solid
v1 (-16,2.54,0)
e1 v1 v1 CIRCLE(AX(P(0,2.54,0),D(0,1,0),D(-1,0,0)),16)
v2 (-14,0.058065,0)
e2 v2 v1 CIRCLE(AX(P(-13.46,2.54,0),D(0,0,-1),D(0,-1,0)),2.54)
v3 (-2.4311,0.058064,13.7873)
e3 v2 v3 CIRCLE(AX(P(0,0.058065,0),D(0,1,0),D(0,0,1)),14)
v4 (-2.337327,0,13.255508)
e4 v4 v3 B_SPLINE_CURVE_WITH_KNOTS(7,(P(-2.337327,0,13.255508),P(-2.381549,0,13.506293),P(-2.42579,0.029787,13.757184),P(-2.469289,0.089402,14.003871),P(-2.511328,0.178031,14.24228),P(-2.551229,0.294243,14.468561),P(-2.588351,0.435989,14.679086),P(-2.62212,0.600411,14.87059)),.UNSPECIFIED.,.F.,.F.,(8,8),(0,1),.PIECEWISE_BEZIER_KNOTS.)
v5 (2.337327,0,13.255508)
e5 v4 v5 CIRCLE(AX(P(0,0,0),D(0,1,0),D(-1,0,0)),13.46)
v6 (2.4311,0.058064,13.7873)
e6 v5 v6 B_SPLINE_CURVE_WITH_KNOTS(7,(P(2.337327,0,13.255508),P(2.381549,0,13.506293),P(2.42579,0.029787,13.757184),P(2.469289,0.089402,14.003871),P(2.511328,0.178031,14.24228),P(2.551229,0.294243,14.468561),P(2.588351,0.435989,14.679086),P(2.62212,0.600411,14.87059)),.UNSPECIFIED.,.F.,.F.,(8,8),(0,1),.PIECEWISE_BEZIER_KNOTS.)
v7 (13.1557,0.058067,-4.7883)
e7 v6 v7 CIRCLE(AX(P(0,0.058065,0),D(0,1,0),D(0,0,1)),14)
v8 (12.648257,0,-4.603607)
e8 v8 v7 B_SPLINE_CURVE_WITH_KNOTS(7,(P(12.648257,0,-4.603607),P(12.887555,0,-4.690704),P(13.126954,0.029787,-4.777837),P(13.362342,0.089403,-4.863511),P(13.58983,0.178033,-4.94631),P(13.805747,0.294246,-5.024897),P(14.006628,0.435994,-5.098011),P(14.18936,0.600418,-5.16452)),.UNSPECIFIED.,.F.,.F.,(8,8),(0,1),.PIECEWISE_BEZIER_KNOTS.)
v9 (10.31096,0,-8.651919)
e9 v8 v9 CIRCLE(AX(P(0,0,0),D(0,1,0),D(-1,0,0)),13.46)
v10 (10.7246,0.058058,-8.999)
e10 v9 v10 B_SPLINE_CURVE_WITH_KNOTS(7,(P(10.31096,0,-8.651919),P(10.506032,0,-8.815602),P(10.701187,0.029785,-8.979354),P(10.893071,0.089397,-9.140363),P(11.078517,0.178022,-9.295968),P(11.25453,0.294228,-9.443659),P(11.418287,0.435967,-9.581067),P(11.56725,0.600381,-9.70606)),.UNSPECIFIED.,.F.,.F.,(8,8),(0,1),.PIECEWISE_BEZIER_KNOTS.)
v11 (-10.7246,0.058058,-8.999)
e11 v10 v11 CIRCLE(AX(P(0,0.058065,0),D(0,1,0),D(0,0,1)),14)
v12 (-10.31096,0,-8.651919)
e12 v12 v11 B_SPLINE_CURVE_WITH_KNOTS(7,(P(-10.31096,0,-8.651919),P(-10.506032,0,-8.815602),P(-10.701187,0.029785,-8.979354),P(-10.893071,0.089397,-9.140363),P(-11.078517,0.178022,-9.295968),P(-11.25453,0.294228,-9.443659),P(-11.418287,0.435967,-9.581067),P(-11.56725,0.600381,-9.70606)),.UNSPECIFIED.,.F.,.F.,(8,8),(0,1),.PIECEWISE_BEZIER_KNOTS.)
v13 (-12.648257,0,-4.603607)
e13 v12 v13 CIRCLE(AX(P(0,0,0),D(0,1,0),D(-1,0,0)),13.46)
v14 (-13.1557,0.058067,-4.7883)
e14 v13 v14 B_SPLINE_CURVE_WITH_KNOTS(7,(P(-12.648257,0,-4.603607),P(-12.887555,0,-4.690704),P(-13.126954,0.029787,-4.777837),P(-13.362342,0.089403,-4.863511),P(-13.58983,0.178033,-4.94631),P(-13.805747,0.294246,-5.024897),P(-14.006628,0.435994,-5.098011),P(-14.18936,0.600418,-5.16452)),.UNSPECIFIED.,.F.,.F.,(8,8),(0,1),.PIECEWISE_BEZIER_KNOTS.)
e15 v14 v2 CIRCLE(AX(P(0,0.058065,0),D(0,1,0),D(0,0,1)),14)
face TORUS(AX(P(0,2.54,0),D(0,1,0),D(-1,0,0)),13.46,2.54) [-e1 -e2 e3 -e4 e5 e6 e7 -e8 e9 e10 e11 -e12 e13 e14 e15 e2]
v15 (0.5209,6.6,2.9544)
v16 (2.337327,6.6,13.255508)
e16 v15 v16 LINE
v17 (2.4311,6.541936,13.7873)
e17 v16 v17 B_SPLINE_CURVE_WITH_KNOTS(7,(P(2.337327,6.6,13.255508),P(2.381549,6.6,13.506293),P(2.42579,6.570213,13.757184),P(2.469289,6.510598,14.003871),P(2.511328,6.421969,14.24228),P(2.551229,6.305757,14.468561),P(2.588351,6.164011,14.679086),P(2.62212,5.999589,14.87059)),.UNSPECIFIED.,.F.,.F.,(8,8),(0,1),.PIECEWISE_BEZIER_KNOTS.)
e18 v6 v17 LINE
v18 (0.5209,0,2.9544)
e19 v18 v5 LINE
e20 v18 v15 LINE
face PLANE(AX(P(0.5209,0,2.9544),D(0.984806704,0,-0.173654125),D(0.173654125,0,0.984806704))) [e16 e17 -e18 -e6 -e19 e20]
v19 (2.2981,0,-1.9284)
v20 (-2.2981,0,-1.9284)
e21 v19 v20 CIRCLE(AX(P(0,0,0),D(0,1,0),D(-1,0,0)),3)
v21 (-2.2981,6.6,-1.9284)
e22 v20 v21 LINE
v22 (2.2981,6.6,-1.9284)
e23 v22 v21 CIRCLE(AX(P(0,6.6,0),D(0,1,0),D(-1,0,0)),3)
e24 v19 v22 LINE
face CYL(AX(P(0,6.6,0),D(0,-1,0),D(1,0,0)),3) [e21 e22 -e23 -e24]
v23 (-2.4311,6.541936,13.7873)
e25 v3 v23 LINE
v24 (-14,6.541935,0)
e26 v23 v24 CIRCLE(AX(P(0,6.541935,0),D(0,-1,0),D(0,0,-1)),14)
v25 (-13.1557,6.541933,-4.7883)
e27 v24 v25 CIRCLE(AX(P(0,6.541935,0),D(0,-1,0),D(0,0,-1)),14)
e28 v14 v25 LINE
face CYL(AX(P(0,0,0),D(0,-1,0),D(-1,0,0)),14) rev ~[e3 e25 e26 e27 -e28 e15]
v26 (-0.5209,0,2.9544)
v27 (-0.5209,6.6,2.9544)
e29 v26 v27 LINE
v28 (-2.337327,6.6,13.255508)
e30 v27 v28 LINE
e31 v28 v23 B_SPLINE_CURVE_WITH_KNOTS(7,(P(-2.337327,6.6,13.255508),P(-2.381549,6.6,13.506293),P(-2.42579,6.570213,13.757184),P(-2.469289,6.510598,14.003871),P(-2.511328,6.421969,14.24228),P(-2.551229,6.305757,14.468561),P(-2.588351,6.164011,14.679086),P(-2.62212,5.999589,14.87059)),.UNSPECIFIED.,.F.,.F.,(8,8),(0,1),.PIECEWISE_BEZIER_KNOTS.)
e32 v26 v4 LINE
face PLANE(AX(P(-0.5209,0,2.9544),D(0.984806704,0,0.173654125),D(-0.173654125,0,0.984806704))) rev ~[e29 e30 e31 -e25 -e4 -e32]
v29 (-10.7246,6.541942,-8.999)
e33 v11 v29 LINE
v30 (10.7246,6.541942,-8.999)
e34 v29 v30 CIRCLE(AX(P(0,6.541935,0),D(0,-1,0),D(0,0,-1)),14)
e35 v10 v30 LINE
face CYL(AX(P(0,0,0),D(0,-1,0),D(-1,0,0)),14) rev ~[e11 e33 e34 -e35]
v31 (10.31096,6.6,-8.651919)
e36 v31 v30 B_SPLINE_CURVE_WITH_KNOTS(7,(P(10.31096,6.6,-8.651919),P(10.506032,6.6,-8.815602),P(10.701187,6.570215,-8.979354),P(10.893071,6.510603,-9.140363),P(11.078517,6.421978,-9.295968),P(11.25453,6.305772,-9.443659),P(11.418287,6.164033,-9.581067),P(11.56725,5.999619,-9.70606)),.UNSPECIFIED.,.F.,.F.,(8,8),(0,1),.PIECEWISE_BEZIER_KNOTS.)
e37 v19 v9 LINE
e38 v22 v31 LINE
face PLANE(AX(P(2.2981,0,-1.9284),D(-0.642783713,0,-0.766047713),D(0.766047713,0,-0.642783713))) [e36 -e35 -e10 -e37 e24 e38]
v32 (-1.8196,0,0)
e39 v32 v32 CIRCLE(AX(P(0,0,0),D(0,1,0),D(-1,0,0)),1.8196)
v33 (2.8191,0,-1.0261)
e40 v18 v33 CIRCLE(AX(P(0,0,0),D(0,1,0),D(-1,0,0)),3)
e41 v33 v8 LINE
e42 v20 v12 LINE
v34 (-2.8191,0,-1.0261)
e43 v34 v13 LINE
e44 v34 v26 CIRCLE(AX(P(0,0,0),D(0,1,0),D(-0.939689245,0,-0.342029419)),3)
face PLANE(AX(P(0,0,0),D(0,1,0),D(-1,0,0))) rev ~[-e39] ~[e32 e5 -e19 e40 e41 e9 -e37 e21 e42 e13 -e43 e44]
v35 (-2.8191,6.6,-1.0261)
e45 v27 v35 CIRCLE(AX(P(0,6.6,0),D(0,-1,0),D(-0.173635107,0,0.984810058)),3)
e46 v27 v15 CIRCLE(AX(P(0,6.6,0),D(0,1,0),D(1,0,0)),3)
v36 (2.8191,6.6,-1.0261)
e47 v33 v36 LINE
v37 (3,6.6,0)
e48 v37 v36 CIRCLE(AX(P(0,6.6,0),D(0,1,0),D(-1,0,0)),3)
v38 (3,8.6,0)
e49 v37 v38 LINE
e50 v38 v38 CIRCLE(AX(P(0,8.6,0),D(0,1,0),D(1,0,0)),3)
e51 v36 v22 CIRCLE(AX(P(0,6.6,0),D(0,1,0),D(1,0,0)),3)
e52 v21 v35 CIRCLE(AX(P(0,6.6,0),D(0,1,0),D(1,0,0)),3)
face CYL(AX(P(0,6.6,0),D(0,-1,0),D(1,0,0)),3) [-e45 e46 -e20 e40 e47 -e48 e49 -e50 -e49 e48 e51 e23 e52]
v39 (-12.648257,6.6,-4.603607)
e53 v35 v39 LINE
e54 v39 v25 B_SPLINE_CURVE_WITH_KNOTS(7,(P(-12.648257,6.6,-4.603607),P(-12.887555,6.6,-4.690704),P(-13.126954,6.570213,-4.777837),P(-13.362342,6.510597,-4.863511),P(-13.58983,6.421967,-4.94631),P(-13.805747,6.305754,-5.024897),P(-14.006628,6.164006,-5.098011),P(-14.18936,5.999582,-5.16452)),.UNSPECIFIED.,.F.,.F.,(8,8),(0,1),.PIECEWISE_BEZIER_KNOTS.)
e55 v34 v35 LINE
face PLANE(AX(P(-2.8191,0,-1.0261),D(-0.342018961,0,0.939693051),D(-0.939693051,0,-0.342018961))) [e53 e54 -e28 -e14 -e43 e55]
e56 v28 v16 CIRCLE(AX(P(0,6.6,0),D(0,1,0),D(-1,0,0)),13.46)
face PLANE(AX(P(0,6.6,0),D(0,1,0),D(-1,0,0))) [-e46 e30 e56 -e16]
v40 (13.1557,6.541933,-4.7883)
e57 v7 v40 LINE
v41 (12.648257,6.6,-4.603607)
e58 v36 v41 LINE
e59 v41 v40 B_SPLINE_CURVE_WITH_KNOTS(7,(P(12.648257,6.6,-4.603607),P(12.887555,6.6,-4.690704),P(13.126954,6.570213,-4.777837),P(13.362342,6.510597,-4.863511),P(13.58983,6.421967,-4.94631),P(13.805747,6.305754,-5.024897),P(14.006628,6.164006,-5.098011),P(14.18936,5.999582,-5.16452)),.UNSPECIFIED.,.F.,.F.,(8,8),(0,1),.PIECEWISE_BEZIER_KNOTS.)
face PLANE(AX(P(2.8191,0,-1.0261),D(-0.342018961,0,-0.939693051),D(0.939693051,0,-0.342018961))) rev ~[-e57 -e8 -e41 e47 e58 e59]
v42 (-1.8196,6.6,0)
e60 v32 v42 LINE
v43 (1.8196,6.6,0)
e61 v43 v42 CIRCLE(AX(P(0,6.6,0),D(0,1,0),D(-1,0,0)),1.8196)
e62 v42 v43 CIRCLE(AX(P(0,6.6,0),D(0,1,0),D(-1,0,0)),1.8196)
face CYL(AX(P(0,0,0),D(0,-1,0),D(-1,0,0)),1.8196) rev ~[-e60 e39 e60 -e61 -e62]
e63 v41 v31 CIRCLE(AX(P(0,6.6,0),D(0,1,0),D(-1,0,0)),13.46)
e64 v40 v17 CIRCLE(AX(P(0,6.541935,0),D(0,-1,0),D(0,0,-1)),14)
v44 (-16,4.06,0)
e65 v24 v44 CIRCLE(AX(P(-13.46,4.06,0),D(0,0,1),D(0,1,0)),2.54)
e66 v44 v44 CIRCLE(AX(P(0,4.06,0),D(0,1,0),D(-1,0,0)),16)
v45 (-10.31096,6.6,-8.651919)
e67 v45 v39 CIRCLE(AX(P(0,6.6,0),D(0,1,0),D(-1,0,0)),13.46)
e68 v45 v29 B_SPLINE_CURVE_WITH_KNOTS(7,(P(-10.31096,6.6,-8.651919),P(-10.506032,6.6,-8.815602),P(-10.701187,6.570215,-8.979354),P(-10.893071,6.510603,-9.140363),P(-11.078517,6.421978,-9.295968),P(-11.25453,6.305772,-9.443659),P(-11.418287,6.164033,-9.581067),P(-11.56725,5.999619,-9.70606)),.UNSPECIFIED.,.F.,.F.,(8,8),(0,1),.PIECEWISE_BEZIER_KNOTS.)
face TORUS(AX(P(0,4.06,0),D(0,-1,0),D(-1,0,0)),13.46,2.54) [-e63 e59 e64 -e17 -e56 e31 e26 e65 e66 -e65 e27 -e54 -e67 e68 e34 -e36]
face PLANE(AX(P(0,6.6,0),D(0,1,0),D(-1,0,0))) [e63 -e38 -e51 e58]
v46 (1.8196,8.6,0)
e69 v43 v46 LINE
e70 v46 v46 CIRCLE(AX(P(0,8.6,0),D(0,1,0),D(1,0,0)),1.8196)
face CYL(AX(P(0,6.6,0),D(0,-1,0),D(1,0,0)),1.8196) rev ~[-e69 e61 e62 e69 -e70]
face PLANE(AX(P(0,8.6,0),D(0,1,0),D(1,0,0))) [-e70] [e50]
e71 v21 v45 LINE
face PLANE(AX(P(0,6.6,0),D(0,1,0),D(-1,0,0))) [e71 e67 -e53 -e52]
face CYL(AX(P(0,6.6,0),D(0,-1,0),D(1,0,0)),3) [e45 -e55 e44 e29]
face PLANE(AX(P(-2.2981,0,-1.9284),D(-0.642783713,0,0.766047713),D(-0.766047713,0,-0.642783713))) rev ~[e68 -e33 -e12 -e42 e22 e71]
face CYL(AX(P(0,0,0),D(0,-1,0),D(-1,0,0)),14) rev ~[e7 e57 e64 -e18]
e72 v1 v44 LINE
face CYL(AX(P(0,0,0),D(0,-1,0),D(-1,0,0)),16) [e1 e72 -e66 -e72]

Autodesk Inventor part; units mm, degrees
ref_plane "YZ Plane" through (0, 0, 0) normal (1, 0, 0) x (0, 1, 0)
ref_plane "XZ Plane" through (0, 0, 0) normal (0, 1, 0) x (-1, 0, 0)
ref_plane "XY Plane" through (0, 0, 0) normal (0, 0, 1) x (1, 0, 0)
sketch "Sketch2" plane through (0, 0, 0) normal (0, 1, 0) x (-1, 0, 0)
  circle A0 centre (0, 0) radius 14
  line L0 (0, 0) -> (0, 14) construction
  line L1 (0, 0) -> (12.1244, -7) construction
  line L2 (0, 0) -> (-12.1244, -7) construction
  circle A1 centre (0, 0) radius 3
  line L3 (2.8191, -1.0261) -> (13.1557, -4.7883)
  line L4 (2.2981, -1.9284) -> (10.7246, -8.999)
  line L5 (0.5209, 2.9544) -> (2.4311, 13.7873)
  line L6 (-0.5209, 2.9544) -> (-2.4311, 13.7873)
  line L7 (-2.8191, -1.0261) -> (-13.1557, -4.7883)
  line L8 (-2.2981, -1.9284) -> (-10.7246, -8.999)
  circle A2 centre (0, 0) radius 16
  circle A3 centre (0, 0) radius 1.8196
  dimension "d10" = 120
  dimension "d11" = 120
  dimension "d18" = 6
  dimension "d19" = 10
  dimension "d20" = 20
  dimension "d21" = 10
  dimension "d22" = 20
  dimension "d23" = 10
  dimension "d24" = 20
  dimension "d26" = 3.6391
  dimension "d29" = 32
  dimension "d30" = 2
extrude "Extrusion1" add sketch "Sketch2" along normal blind 6.6 contours L5 A1 L6 A0 | A0 L4 A1 L3 | A1 | L7 A1 L8 A0 | A2
sketch "Sketch3" plane through (0, 6.6, 0) normal (0, 1, 0) x (1, 0, 0)
  circle A0 centre (0, 0) radius 3
  circle A1 centre (0, 0) radius 1.8196 projected
  circle A2 centre (0, 0) radius 1.8196
extrude "Extrusion2" add sketch "Sketch3" along normal blind 2
fillet "Fillet4" radius 2.54 2 edges at (16, 6.6, 0) (16, 0, 0)
properties part number "wheel"
